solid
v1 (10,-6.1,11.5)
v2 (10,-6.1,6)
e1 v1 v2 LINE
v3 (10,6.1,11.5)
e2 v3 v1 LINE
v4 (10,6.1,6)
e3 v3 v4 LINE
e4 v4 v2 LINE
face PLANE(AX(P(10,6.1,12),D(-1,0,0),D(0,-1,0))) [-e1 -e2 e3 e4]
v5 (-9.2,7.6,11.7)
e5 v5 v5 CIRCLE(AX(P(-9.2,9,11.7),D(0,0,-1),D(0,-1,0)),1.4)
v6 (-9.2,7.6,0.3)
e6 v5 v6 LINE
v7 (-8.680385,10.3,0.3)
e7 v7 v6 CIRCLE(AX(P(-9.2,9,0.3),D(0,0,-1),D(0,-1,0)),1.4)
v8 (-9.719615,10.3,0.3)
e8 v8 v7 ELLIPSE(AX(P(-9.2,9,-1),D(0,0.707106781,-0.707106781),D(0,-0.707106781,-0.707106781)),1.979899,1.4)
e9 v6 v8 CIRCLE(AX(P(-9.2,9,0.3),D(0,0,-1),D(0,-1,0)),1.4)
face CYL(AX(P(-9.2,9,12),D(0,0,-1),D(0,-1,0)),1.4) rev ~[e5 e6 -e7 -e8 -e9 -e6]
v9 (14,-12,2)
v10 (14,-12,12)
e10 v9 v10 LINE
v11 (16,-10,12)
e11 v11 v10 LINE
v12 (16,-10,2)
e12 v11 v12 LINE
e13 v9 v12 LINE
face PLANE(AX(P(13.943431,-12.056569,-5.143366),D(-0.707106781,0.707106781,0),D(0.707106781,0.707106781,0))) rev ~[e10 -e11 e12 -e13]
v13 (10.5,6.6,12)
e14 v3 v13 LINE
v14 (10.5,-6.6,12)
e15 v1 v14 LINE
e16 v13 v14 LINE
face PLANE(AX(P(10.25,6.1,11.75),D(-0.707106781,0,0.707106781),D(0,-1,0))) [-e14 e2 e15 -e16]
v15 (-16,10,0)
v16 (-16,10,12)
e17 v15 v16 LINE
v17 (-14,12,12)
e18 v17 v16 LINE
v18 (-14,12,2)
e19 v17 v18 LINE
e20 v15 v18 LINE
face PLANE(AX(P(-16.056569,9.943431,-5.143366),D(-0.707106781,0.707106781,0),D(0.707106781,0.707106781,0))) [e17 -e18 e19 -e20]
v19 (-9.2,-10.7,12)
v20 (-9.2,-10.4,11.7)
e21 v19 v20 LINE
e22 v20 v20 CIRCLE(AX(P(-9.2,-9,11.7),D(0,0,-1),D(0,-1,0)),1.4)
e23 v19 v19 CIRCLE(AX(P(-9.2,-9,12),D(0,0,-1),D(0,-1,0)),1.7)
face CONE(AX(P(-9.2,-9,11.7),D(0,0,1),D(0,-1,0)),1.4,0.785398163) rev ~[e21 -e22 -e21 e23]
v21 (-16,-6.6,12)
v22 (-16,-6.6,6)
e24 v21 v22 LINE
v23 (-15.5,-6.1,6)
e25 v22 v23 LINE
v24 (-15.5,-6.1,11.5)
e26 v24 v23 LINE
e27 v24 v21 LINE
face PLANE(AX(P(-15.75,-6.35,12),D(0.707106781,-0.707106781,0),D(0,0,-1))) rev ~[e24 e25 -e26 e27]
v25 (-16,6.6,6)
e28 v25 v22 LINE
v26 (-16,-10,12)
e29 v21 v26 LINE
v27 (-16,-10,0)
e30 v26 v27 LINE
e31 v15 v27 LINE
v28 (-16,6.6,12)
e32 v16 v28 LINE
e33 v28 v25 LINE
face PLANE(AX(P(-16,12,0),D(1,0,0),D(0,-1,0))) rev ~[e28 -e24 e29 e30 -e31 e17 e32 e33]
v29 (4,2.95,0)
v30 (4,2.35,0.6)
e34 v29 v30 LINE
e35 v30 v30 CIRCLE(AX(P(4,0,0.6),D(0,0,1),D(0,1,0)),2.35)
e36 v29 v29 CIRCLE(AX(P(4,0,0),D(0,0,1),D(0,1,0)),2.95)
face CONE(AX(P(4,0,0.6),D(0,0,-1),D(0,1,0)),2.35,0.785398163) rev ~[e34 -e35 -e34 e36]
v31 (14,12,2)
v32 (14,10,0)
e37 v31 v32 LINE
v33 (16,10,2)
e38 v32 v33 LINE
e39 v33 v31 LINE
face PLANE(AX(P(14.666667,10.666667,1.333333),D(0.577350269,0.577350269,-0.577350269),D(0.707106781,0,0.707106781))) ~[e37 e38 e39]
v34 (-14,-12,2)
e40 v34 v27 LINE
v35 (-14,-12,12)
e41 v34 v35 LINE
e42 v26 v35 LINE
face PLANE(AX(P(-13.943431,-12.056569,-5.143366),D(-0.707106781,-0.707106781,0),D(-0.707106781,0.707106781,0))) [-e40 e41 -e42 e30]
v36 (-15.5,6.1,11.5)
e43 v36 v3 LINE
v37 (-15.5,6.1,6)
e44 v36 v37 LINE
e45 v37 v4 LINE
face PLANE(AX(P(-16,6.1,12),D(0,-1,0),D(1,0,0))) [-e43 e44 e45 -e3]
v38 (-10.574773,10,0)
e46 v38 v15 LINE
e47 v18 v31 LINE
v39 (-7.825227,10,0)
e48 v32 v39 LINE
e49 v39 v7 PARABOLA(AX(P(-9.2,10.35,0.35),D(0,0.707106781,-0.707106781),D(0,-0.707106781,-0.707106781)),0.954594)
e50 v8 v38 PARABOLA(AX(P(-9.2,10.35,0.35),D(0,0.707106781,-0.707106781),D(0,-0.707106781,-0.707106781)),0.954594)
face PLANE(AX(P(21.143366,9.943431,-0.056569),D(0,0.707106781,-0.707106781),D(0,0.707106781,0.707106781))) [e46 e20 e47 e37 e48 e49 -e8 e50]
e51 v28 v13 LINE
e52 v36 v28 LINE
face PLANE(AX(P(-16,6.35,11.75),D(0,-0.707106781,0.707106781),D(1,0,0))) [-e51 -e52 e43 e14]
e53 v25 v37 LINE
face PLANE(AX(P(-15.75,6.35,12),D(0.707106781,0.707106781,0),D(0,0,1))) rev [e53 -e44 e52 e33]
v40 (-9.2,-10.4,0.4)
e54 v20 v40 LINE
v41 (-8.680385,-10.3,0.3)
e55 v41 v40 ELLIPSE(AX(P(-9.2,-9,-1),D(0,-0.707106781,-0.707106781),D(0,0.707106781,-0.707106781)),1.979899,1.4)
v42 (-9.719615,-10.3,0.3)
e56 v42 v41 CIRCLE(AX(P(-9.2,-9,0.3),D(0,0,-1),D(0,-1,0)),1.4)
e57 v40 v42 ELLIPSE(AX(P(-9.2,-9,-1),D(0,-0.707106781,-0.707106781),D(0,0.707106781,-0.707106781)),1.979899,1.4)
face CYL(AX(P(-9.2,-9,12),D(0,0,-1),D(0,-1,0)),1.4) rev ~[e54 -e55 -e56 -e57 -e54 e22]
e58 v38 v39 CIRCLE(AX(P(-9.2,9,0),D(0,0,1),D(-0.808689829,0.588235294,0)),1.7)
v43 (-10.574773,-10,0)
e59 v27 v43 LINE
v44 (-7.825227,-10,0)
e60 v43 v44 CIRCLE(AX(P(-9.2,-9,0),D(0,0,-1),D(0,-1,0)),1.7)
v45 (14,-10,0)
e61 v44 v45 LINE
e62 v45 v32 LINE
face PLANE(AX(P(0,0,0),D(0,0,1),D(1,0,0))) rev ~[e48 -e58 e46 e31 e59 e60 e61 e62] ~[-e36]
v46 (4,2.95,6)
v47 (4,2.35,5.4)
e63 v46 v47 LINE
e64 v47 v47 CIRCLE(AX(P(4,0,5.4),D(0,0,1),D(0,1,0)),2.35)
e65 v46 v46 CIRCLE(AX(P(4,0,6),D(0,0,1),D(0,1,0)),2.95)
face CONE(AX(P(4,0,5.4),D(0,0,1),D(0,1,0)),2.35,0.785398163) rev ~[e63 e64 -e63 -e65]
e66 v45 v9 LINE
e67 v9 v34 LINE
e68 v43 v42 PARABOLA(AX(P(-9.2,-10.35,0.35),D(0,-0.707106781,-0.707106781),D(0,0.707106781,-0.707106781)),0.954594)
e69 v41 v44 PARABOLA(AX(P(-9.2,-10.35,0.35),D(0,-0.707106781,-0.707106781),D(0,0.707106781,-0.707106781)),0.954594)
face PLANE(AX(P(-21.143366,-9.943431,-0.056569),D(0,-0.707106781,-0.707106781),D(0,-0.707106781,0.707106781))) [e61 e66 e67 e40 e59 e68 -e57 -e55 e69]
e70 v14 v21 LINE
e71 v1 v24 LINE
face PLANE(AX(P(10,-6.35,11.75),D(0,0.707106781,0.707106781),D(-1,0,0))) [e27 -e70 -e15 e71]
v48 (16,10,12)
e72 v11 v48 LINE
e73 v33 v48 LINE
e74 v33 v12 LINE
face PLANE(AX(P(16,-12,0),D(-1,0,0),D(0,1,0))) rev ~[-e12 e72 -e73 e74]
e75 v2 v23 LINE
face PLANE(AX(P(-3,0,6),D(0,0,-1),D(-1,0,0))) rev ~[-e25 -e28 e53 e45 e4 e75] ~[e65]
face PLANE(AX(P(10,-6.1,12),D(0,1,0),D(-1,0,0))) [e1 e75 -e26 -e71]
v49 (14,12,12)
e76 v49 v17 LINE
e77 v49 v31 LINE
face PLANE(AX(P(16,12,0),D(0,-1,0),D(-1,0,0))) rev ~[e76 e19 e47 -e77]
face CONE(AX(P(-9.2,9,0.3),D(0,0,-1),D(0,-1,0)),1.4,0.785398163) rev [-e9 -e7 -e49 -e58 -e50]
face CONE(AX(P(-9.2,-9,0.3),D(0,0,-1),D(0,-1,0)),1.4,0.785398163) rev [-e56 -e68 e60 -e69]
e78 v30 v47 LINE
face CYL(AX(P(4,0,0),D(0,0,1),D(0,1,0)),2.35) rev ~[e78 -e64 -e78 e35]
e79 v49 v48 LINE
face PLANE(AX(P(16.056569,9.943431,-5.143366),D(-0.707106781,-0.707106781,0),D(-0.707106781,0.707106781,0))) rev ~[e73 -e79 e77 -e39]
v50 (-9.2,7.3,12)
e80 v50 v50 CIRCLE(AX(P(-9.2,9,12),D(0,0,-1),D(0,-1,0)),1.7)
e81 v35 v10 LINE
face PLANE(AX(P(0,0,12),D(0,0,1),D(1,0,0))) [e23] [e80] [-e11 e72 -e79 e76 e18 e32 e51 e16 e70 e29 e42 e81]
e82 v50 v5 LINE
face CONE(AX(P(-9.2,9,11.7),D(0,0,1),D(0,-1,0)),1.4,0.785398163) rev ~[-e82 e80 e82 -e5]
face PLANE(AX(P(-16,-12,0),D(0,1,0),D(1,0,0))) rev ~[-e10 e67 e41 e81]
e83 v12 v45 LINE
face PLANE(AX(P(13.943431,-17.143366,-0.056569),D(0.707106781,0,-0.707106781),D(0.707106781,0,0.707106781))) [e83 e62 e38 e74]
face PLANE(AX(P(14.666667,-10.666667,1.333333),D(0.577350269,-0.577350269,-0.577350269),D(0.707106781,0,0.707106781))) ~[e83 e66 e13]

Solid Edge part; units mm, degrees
sketch "Sketch1" plane through (0, 0, 0) normal (0, 0, 1) x (1, 0, 0)
  line L0 (-16, -12) -> (16, -12)
  line L1 (16, -12) -> (16, 12)
  line L2 (16, 12) -> (-16, 12)
  line L3 (-16, 12) -> (-16, -12)
  dimension "D1" = 24
  dimension "D2" = 32
extrude "Protrusion1" add sketch "Sketch1" along normal blind 12
sketch "Sketch2" plane through (0, 0, 12) normal (0, 0, 1) x (0, 1, 0)
  line L0 (-6.1, 16) -> (6.1, 16)
  line L1 (6.1, 16) -> (6.1, -10)
  line L2 (6.1, -10) -> (-6.1, -10)
  line L3 (-6.1, -10) -> (-6.1, 16)
  dimension "D1" = 12.2
  dimension "D2" = 26
extrude "servo_cutout" cut sketch "Sketch2" against normal blind 6
hole "screw_bearing" at (4, 0, 0) direction (0, 0, 1) diameter 4.7 depth 30 tip angle 118 start chamfer 0.6 start chamfer angle 45 end chamfer 0.6 end chamfer angle 45
chamfer "Chamfer1" distance 0.5 angle 45 5 edges at (-3, -6.1, 12) (-16, -6.1, 9) (10, 0, 12) (-3, 6.1, 12) (-16, 6.1, 9)
hole "Hole1" at (-9.2, 9, 12) direction (0, 0, -1) diameter 2.8 depth 30 tip angle 118 start chamfer 0.3 start chamfer angle 45 end chamfer 0.3 end chamfer angle 45
hole "Hole2" at (-9.2, -9, 12) direction (0, 0, -1) diameter 2.8 depth 30 tip angle 118 start chamfer 0.3 start chamfer angle 45 end chamfer 0.3 end chamfer angle 45
chamfer "Chamfer2" distance 2 angle 45 7 edges at (16, 12, 6) (0, 12, 0) (16, 0, 0) (0, -12, 0) (16, -12, 6) (-16, 12, 6) (-16, -12, 6)
properties material "Polypropylene, general purpose"
